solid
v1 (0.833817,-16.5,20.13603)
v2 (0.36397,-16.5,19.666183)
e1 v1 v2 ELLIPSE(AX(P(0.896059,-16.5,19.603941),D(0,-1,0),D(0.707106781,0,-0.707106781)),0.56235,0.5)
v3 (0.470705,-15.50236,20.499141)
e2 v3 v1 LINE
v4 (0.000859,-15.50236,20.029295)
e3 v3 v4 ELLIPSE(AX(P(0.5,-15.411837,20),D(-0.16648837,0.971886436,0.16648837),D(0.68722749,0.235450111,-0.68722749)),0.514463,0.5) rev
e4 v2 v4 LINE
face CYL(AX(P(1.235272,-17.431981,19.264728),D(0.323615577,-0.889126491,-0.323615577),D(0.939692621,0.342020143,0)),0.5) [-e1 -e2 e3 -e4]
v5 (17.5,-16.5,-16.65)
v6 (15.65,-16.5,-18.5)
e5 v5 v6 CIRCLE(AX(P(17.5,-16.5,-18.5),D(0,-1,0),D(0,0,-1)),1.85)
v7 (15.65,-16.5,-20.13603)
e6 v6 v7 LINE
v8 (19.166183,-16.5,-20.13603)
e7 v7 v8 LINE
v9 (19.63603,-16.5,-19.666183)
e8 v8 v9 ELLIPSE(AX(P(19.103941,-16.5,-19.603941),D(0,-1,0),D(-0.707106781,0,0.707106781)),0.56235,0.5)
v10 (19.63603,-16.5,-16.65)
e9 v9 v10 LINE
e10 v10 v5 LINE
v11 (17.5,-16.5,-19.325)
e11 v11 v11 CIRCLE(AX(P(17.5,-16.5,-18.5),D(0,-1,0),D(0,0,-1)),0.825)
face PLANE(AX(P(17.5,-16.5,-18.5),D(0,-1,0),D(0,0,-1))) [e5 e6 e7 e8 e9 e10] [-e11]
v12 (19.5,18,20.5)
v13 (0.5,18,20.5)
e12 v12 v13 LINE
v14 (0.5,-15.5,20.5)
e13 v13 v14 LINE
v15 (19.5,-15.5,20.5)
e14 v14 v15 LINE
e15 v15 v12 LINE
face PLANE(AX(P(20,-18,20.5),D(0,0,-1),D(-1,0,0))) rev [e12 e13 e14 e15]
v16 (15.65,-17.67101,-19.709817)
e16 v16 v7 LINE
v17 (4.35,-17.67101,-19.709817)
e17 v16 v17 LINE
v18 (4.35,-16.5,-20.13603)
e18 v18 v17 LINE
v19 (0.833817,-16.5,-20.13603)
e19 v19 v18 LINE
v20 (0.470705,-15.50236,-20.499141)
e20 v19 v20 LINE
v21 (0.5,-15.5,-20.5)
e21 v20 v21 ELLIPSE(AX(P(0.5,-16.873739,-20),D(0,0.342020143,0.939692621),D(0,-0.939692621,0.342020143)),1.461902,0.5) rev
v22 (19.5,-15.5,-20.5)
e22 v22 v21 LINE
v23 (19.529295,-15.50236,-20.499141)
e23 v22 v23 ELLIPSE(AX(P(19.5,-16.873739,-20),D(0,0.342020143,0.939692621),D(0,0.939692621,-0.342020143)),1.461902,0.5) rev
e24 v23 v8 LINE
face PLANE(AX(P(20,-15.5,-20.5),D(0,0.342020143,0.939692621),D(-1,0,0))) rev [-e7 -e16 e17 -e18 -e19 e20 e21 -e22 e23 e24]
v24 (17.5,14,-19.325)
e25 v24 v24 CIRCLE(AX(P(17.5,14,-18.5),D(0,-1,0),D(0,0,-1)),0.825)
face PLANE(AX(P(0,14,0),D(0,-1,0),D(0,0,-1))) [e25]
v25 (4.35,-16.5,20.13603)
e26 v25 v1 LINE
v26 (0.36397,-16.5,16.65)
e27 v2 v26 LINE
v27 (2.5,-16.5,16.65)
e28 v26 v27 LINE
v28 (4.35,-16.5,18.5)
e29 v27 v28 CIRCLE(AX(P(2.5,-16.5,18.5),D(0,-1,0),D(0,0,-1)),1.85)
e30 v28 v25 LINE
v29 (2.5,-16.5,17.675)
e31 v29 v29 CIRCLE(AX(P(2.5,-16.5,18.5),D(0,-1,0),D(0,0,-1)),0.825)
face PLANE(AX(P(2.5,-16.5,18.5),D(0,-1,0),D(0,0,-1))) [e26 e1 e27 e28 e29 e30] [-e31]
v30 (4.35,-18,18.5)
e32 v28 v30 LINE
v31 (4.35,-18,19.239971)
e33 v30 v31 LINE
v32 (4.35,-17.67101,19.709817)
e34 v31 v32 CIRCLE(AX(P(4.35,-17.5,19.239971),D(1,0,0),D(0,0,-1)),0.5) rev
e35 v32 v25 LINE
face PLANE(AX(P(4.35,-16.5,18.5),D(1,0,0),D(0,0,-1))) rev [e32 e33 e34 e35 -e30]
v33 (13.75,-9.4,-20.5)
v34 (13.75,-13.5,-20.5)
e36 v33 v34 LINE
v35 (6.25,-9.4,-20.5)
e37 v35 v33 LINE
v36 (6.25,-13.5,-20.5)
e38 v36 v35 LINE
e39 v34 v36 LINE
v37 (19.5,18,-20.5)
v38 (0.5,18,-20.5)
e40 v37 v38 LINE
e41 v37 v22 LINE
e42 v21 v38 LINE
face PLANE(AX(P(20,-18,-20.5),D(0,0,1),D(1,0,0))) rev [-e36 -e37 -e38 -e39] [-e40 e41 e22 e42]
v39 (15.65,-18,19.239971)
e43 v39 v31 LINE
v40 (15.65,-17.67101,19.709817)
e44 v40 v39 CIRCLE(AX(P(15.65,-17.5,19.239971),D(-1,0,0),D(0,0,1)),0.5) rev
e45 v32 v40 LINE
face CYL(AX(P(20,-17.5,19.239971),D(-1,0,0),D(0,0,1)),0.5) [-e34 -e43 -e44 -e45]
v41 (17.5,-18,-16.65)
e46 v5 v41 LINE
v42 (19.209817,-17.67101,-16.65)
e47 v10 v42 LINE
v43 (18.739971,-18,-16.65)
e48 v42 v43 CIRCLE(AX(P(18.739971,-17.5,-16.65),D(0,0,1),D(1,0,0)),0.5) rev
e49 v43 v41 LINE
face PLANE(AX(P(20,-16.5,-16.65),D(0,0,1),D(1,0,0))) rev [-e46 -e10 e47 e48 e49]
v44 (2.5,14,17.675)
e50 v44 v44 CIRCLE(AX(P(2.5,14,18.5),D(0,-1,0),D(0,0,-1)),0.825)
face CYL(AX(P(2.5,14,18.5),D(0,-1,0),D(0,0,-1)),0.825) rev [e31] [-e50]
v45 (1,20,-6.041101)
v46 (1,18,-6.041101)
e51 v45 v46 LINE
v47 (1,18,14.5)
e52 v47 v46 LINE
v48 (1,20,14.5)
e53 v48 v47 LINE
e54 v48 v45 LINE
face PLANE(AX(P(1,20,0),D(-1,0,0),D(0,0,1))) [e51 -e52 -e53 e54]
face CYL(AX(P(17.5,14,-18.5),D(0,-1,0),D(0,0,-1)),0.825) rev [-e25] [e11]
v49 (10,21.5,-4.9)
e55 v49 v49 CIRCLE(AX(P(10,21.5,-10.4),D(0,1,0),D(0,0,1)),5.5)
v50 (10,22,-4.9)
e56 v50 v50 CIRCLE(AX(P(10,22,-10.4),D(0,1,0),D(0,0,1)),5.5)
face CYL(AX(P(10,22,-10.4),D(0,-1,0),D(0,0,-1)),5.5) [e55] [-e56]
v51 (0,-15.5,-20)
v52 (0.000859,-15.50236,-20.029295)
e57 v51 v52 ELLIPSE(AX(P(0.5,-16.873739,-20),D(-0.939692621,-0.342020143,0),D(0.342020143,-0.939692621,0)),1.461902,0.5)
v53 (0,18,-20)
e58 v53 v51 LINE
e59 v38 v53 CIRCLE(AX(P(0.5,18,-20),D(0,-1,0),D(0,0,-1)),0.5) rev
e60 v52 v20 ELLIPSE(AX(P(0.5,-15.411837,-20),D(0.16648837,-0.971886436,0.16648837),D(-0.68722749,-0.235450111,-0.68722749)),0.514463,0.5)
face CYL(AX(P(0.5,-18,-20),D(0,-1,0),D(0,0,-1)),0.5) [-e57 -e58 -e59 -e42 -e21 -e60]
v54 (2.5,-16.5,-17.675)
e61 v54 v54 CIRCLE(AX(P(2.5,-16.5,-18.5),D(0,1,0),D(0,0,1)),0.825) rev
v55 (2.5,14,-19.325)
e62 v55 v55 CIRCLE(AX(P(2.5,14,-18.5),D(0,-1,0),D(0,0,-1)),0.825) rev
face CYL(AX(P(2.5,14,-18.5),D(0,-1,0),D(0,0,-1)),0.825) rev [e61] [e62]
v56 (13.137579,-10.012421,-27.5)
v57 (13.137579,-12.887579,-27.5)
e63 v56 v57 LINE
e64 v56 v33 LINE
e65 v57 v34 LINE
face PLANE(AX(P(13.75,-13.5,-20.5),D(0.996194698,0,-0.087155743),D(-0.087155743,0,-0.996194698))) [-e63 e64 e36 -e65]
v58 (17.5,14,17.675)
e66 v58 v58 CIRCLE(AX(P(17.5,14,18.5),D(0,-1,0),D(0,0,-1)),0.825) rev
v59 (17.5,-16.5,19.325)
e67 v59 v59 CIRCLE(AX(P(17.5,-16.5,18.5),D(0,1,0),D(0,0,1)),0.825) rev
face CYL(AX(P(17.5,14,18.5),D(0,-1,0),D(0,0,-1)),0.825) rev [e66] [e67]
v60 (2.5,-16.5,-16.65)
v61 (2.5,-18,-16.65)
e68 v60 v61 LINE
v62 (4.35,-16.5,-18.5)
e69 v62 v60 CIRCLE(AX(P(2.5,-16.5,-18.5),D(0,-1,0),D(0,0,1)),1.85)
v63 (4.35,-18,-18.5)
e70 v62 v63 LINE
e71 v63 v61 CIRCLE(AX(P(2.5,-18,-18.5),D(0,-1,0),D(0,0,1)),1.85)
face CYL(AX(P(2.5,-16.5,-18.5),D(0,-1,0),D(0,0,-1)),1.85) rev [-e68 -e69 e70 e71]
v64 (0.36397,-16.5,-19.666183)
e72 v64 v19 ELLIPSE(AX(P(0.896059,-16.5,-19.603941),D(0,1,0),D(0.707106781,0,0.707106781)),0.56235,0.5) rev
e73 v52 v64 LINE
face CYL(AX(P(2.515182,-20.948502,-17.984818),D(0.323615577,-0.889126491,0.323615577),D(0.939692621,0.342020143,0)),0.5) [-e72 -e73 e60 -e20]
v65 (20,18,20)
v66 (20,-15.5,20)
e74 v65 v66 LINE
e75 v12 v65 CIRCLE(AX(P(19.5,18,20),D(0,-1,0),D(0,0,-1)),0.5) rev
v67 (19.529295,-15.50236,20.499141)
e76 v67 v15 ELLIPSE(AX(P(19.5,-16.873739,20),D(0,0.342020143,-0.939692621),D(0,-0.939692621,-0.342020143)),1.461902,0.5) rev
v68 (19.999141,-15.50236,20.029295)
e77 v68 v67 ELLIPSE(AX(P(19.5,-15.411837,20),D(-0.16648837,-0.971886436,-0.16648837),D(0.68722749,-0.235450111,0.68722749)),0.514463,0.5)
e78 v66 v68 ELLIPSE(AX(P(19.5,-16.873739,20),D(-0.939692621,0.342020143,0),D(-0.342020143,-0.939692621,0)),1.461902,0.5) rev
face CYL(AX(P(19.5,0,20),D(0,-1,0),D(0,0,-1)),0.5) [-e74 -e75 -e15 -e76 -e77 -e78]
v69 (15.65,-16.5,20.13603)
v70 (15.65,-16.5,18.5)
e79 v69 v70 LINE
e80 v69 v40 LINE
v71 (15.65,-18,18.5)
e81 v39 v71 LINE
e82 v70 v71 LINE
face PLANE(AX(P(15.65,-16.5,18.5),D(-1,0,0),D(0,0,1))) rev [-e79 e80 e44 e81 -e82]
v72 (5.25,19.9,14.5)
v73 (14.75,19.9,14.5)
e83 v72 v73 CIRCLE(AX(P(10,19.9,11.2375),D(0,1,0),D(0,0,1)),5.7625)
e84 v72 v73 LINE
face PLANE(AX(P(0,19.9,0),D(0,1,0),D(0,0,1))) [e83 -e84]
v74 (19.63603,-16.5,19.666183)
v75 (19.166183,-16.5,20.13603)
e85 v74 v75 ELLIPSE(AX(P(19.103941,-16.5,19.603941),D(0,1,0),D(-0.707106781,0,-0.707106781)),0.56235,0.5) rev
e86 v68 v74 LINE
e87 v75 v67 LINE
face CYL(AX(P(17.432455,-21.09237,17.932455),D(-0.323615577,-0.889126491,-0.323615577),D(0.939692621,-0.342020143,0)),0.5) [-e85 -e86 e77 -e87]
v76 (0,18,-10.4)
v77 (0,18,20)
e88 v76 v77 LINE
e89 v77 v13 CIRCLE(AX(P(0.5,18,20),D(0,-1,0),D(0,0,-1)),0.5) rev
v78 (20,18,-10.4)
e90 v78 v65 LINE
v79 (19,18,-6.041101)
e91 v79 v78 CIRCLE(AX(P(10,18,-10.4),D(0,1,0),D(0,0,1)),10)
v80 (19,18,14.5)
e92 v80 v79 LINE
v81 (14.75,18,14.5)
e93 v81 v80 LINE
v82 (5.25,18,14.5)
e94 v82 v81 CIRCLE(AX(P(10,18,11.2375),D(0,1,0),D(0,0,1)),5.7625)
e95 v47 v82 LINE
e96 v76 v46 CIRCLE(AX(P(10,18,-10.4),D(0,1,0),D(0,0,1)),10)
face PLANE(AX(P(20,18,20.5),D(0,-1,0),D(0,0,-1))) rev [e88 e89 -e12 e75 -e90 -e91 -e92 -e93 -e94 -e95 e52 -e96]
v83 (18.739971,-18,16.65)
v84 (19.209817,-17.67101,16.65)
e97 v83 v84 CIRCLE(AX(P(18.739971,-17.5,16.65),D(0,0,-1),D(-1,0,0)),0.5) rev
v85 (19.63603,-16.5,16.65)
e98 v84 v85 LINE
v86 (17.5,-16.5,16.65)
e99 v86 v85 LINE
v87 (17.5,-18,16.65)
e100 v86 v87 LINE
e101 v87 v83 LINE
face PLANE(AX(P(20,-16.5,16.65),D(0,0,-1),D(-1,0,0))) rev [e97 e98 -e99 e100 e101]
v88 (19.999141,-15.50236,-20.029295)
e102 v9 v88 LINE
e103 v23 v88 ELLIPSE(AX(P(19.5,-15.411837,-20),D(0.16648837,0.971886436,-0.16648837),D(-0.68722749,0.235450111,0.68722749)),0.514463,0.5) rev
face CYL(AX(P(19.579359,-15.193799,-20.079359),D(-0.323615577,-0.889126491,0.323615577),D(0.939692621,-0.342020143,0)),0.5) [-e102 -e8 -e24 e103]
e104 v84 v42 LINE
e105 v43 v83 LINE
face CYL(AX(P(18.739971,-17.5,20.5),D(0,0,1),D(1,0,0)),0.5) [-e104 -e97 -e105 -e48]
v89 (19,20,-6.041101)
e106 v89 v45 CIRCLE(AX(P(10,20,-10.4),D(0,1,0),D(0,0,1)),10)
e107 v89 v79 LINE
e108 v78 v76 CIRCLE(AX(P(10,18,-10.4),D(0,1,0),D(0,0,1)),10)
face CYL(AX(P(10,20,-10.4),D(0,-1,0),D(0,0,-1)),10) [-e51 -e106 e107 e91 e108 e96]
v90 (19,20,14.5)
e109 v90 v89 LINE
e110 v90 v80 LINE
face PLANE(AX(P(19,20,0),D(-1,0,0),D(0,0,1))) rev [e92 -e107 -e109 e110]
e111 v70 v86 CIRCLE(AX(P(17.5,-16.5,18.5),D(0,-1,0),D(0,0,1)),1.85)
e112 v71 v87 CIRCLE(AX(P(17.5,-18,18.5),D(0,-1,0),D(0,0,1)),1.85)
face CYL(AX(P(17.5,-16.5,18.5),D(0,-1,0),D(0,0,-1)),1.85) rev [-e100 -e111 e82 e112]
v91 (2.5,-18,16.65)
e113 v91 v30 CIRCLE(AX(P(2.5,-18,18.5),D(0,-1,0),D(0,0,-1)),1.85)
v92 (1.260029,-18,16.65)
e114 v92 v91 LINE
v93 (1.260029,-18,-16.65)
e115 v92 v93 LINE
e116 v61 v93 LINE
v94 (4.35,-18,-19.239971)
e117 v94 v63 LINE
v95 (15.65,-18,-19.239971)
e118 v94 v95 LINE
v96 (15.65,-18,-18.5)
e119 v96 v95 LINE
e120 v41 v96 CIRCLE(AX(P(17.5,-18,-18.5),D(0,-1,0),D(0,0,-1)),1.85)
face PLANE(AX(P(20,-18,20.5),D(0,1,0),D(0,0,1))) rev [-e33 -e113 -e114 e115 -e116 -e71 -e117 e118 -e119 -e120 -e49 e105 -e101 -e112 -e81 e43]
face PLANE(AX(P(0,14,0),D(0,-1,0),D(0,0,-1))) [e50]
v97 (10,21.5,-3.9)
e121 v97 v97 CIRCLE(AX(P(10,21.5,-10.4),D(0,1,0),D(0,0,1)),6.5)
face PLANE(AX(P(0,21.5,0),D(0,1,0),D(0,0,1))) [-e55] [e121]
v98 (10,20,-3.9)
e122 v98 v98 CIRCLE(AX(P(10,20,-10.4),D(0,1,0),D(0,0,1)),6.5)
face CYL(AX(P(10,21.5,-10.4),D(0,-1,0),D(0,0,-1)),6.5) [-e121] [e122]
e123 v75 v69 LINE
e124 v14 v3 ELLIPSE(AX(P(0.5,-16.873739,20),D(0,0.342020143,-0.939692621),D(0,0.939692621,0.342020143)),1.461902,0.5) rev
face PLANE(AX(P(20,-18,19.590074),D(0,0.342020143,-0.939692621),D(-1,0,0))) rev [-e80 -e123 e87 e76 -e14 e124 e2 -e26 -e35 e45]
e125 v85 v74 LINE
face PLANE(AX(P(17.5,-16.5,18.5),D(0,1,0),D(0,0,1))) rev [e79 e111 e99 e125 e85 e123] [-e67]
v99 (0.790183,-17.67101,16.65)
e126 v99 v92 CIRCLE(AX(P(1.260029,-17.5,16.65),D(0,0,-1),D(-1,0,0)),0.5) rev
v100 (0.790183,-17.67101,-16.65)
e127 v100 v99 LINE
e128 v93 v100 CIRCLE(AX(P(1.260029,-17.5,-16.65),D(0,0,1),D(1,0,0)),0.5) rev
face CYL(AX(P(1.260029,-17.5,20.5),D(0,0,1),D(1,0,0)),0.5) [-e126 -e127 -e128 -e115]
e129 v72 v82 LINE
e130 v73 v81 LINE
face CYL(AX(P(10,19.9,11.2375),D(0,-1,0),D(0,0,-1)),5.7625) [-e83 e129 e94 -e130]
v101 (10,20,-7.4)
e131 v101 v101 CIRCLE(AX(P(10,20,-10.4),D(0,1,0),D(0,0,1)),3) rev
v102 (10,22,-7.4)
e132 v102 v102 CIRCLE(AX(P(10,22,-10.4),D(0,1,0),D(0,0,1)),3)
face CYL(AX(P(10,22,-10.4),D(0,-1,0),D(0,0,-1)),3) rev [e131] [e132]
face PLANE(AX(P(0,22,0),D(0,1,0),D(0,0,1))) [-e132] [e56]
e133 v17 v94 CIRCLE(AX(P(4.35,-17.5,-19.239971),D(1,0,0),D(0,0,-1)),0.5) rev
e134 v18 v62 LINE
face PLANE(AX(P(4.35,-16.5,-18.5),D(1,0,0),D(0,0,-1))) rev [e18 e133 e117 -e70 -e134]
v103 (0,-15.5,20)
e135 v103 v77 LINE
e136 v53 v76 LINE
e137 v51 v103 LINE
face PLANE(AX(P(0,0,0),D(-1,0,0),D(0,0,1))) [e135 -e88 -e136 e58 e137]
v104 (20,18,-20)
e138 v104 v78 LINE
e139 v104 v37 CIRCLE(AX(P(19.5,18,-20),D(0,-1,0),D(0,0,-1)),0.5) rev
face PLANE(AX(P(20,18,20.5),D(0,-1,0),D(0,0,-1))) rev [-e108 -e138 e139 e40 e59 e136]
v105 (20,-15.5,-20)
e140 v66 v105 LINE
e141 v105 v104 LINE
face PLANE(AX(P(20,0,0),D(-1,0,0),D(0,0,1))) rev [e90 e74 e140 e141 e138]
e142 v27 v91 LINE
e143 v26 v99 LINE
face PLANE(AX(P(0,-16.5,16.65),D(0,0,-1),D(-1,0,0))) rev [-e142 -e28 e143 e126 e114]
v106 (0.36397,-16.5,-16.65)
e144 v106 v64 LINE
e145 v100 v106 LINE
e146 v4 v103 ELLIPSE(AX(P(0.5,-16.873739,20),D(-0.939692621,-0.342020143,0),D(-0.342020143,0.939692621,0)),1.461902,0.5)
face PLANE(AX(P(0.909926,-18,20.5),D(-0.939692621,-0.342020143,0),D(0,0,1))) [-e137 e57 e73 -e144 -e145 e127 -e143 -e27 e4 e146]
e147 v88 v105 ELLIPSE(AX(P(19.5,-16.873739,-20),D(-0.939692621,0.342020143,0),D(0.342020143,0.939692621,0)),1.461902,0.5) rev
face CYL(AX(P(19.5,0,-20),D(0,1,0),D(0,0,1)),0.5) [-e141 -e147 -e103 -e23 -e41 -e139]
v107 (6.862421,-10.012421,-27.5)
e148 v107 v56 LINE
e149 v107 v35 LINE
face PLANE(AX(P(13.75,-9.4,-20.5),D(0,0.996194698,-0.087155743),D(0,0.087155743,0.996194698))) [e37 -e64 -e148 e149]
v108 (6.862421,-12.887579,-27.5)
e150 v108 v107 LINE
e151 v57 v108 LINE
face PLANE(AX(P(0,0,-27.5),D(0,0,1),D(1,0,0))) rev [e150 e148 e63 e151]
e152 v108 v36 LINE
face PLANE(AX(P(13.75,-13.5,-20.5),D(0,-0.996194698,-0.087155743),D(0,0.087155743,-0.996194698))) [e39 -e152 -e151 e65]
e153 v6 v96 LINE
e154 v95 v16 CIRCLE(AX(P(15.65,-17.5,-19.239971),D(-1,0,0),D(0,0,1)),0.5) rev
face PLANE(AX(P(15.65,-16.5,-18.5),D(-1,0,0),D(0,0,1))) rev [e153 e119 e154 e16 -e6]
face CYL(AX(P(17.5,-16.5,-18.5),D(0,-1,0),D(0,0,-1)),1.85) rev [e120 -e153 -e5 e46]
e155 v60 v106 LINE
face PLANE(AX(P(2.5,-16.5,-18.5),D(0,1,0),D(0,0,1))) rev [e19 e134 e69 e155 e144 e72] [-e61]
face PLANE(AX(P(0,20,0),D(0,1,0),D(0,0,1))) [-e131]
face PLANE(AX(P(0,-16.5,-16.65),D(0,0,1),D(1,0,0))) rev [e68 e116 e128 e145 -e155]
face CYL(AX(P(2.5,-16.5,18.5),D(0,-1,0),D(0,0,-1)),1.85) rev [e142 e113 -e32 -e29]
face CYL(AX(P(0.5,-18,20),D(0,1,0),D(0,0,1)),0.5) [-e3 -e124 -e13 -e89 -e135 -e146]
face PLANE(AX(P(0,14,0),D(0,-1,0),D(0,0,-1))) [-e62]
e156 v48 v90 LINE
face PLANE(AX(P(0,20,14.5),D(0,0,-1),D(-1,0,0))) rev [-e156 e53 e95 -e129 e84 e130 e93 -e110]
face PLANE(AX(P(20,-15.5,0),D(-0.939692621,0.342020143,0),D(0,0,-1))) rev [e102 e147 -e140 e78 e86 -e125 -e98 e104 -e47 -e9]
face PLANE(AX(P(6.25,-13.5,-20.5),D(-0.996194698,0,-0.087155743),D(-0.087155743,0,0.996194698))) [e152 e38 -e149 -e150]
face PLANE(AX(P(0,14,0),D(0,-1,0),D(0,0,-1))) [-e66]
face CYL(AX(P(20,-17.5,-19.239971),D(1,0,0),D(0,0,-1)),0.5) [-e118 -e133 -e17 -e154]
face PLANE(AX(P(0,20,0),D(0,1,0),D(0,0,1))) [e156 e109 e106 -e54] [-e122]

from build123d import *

# Parameters (mm, degrees)
SKETCH1_W             = 41
SKETCH1_H             = 36
BOSS_EXTRUDE1_DEPTH   = 20
BOSS_EXTRUDE2_DEPTH   = 2
BOSS_EXTRUDE3_DEPTH   = 1.9
SKETCH3_R             = 6.5
SKETCH3_R_2           = 5.5
BOSS_EXTRUDE4_DEPTH   = 1.5
SKETCH3_3_R           = 5.5
SKETCH3_3_R_2         = 3
BOSS_EXTRUDE5_DEPTH   = 2
SKETCH10_R            = 0.825
CUT_EXTRUDE3_DEPTH    = 1.5
SKETCH10_10_R         = 0.825
CUT_EXTRUDE4_DEPTH    = 32
CHAMFER2_SIZE         = 2.5
CHAMFER2_SIZE2        = 0.909925586
CHAMFER2_PART_2_SIZE  = 2.5
CHAMFER2_PART_2_SIZE2 = 0.909925586
CHAMFER2_PART_3_SIZE  = 2.5
CHAMFER2_PART_3_SIZE2 = 0.909925586
CHAMFER2_PART_4_SIZE  = 2.5
CHAMFER2_PART_4_SIZE2 = 0.909925586
FILLET2_R             = 0.5
SKETCH11_W            = 7.5
SKETCH11_H            = 4.1
BOSS_EXTRUDE10_DEPTH  = 7
BOSS_EXTRUDE10_TAPER  = 5


with BuildPart() as part:
    # Sketch1 → Boss-Extrude1 (new body)
    with BuildSketch(Plane(origin=(0, 0, 0), x_dir=(0, 0, -1), z_dir=(1, 0, 0))):
        Rectangle(SKETCH1_W, SKETCH1_H)
    extrude(amount=BOSS_EXTRUDE1_DEPTH)

    # Sketch2 → Boss-Extrude2 (add)
    with BuildSketch(Plane(origin=(0, 18, 0), x_dir=(1, 0, 0), z_dir=(0, 1, 0))):
        with BuildLine():
            ThreePointArc((20, 10.4), (7.763932023, 20.146794345), (1, 6.041101056))
            Line((1, 6.041101056), (1, 10.5))
            Line((1, 10.5), (19, 10.5))
            Line((19, 10.5), (19, 6.041101056))
            ThreePointArc((19, 6.041101056), (19.746794345, 8.163932022), (20, 10.4))
        make_face()
        with BuildLine():
            Line((1, 10.5), (1, 6.041101056))
            ThreePointArc((1, 6.041101056), (10, 0.4), (19, 6.041101056))
            Line((19, 6.041101056), (19, 10.5))
            Line((19, 10.5), (1, 10.5))
        make_face()
        with BuildLine():
            Line((1, 6.041101056), (1, -14.5))
            Line((1, -14.5), (5.25, -14.5))
            Line((5.25, -14.5), (14.75, -14.5))
            Line((14.75, -14.5), (19, -14.5))
            Line((19, -14.5), (19, 6.041101056))
            ThreePointArc((19, 6.041101056), (10, 0.4), (1, 6.041101056))
        make_face()
    extrude(amount=BOSS_EXTRUDE2_DEPTH)

    # Sketch2<3> → Boss-Extrude3 (add)
    with BuildSketch(Plane(origin=(0, 18, 0), x_dir=(1, 0, 0), z_dir=(0, 1, 0))):
        with BuildLine():
            Line((14.75, -14.5), (5.25, -14.5))
            ThreePointArc((5.25, -14.5), (10, -17), (14.75, -14.5))
        make_face()
    extrude(amount=BOSS_EXTRUDE3_DEPTH)

    # Sketch3 → Boss-Extrude4 (add)
    with BuildSketch(Plane(origin=(0, 20, 0), x_dir=(1, 0, 0), z_dir=(0, 1, 0))):
        with Locations(Location((10, 10.4, 0), (0, 0, 270))):
            Circle(SKETCH3_R)
        with Locations(Location((10, 10.4, 0), (0, 0, 270))):
            Circle(SKETCH3_R_2, mode=Mode.SUBTRACT)
    extrude(amount=BOSS_EXTRUDE4_DEPTH)

    # Sketch3<3> → Boss-Extrude5 (add)
    with BuildSketch(Plane(origin=(0, 20, 0), x_dir=(1, 0, 0), z_dir=(0, 1, 0))):
        with Locations(Location((10, 10.4, 0), (0, 0, 270))):
            Circle(SKETCH3_3_R)
        with Locations(Location((10, 10.4, 0), (0, 0, 270))):
            Circle(SKETCH3_3_R_2, mode=Mode.SUBTRACT)
    extrude(amount=BOSS_EXTRUDE5_DEPTH)

    # Sketch10 → Cut-Extrude3 (cut)
    # profile 1 of 4: a face of its own
    with BuildSketch(Plane.XZ.offset(18)):
        with BuildLine():
            Line((0, 16.65), (2.5, 16.65))
            ThreePointArc((2.5, 16.65), (3.808147545, 17.191852455), (4.35, 18.5))
            Line((4.35, 18.5), (4.35, 20.5))
            Line((4.35, 20.5), (0, 20.5))
            Line((0, 20.5), (0, 16.65))
        make_face()
        with Locations(Location((2.5, 18.5, 0), (0, 0, 270))):
            Circle(SKETCH10_R, mode=Mode.SUBTRACT)
    # profile 2 of 4: a face of its own
    with BuildSketch(Plane.XZ.offset(18)):
        with BuildLine():
            Line((15.65, 18.5), (15.65, 20.5))
            Line((15.65, 20.5), (20, 20.5))
            Line((20, 20.5), (20, 16.65))
            Line((20, 16.65), (17.5, 16.65))
            ThreePointArc((17.5, 16.65), (16.191852455, 17.191852455), (15.65, 18.5))
        make_face()
        with Locations(Location((17.5, 18.5, 0), (0, 0, 90))):
            Circle(SKETCH10_R, mode=Mode.SUBTRACT)
    # profile 3 of 4: a face of its own
    with BuildSketch(Plane.XZ.offset(18)):
        with BuildLine():
            Line((4.35, -18.5), (4.35, -20.5))
            Line((4.35, -20.5), (0, -20.5))
            Line((0, -20.5), (0, -16.65))
            Line((0, -16.65), (2.5, -16.65))
            ThreePointArc((2.5, -16.65), (3.808147545, -17.191852455), (4.35, -18.5))
        make_face()
        with Locations(Location((2.5, -18.5, 0), (0, 0, 90))):
            Circle(SKETCH10_R, mode=Mode.SUBTRACT)
    # profile 4 of 4: a face of its own
    with BuildSketch(Plane.XZ.offset(18)):
        with BuildLine():
            Line((20, -16.65), (17.5, -16.65))
            ThreePointArc((17.5, -16.65), (16.191852455, -17.191852455), (15.65, -18.5))
            Line((15.65, -18.5), (15.65, -20.5))
            Line((15.65, -20.5), (20, -20.5))
            Line((20, -20.5), (20, -16.65))
        make_face()
        with Locations(Location((17.5, -18.5, 0), (0, 0, 270))):
            Circle(SKETCH10_R, mode=Mode.SUBTRACT)
    extrude(amount=-CUT_EXTRUDE3_DEPTH, mode=Mode.SUBTRACT)

    # Sketch10<10> → Cut-Extrude4 (cut)
    with BuildSketch(Plane.XZ.offset(18)):
        with Locations(Location((2.5, 18.5, 0), (0, 0, 270))):
            Circle(SKETCH10_10_R)
        with Locations(Location((17.5, 18.5, 0), (0, 0, 270))):
            Circle(SKETCH10_10_R)
        with Locations(Location((17.5, -18.5, 0), (0, 0, 270))):
            Circle(SKETCH10_10_R)
        with Locations(Location((2.5, -18.5, 0), (0, 0, 270))):
            Circle(SKETCH10_10_R)
    extrude(amount=-CUT_EXTRUDE4_DEPTH, mode=Mode.SUBTRACT)

    # Chamfer2
    chamfer2_edges = [part.edges().sort_by_distance(p)[0] for p in [
        (10, -18, 20.5),
    ]]
    chamfer2_side = [part.faces().sort_by_distance(p)[0] for p in [
        (10, 0.318427753, 20.5),
    ]]
    chamfer(chamfer2_edges, length=CHAMFER2_SIZE, length2=CHAMFER2_SIZE2, reference=chamfer2_side[0])

    # Chamfer2 part 2
    chamfer2_part_2_edges = [part.edges().sort_by_distance(p)[0] for p in [
        (20, -18, 0),
    ]]
    chamfer2_part_2_side = [part.faces().sort_by_distance(p)[0] for p in [
        (20, 0.13604937, 0),
    ]]
    chamfer(chamfer2_part_2_edges, length=CHAMFER2_PART_2_SIZE, length2=CHAMFER2_PART_2_SIZE2, reference=chamfer2_part_2_side[0])

    # Chamfer2 part 3
    chamfer2_part_3_edges = [part.edges().sort_by_distance(p)[0] for p in [
        (10, -18, -20.5),
    ]]
    chamfer2_part_3_side = [part.faces().sort_by_distance(p)[0] for p in [
        (10, 0.318427753, -20.5),
    ]]
    chamfer(chamfer2_part_3_edges, length=CHAMFER2_PART_3_SIZE, length2=CHAMFER2_PART_3_SIZE2, reference=chamfer2_part_3_side[0])

    # Chamfer2 part 4
    chamfer2_part_4_edges = [part.edges().sort_by_distance(p)[0] for p in [
        (0, -18, 0),
    ]]
    chamfer2_part_4_side = [part.faces().sort_by_distance(p)[0] for p in [
        (0, 0.13604937, 0),
    ]]
    chamfer(chamfer2_part_4_edges, length=CHAMFER2_PART_4_SIZE, length2=CHAMFER2_PART_4_SIZE2, reference=chamfer2_part_4_side[0])

    # Fillet2
    # the kernel refuses this fillet: 0.5 mm, written as the material it takes off along each edge
    with BuildSketch(Plane(origin=(20, 19.25, 20.5), x_dir=(-1, 0, 0), z_dir=(0, -1, 0)), Plane(origin=(0, -16.75, -20.5), x_dir=(0, 0, 1), z_dir=(0, 1, 0)), Plane(origin=(20, -16.75, -20.5), x_dir=(-1, 0, 0), z_dir=(0, 1, 0)), Plane(origin=(0, 19.25, 20.5), x_dir=(0, 0, -1), z_dir=(0, -1, 0))) as fillet2_piece_1:
        with BuildLine():
            CenterArc((FILLET2_R, FILLET2_R), FILLET2_R, 180, 90)
            Line((0, FILLET2_R), (0, 0))
            Line((0, 0), (FILLET2_R, 0))
        make_face()
    extrude(amount=36, mode=Mode.SUBTRACT)
    with BuildSketch(Plane(origin=(19.090074414, -18, 17.525259423), x_dir=(-1, 0, 0), z_dir=(0, 0, -1))) as fillet2_piece_2:
        with BuildLine():
            CenterArc((FILLET2_R * 0.70020753821, FILLET2_R), FILLET2_R, 200, 70)
            Line((-FILLET2_R * 0.239485082576, FILLET2_R * 0.657979856674), (0, 0))
            Line((0, 0), (FILLET2_R * 0.70020753821, 0))
        make_face()
    extrude(amount=35.050518846, mode=Mode.SUBTRACT)
    with BuildSketch(Plane(origin=(3.474740577, -18, 19.590074414), x_dir=(0, 0, -1), z_dir=(1, 0, 0))) as fillet2_piece_3:
        with BuildLine():
            CenterArc((FILLET2_R * 0.70020753821, FILLET2_R), FILLET2_R, 200, 70)
            Line((-FILLET2_R * 0.239485082576, FILLET2_R * 0.657979856674), (0, 0))
            Line((0, 0), (FILLET2_R * 0.70020753821, 0))
        make_face()
    extrude(amount=13.050518846, mode=Mode.SUBTRACT)
    with BuildSketch(Plane(origin=(0.909925586, -18, 17.525259423), x_dir=(1, 0, 0), z_dir=(0, 0, -1))) as fillet2_piece_4:
        with BuildLine():
            CenterArc((FILLET2_R * 0.70020753821, -FILLET2_R), FILLET2_R, 90, 70)
            Line((-FILLET2_R * 0.239485082576, -FILLET2_R * 0.657979856674), (0, 0))
            Line((0, 0), (FILLET2_R * 0.70020753821, 0))
        make_face()
    extrude(amount=35.050518846, mode=Mode.SUBTRACT)
    with BuildSketch(Plane(origin=(3.474740577, -18, -19.590074414), x_dir=(0, 0, 1), z_dir=(1, 0, 0))) as fillet2_piece_5:
        with BuildLine():
            CenterArc((FILLET2_R * 0.70020753821, -FILLET2_R), FILLET2_R, 90, 70)
            Line((-FILLET2_R * 0.239485082576, -FILLET2_R * 0.657979856674), (0, 0))
            Line((0, 0), (FILLET2_R * 0.70020753821, 0))
        make_face()
    extrude(amount=13.050518846, mode=Mode.SUBTRACT)
    with BuildSketch(Plane(origin=(20.359668978, -14.511817604, 20.859668978), x_dir=(-0.9461886483394649, 0.3040991697893318, 0.1106830460683808), z_dir=(-0.3236155771181854, -0.8891264907159879, -0.3236155771181854)), Plane(origin=(-0.359668978, -14.511817604, 20.859668978), x_dir=(-0.11068304606838054, 0.30409916978933194, -0.9461886483394649), z_dir=(0.3236155771181852, -0.8891264907159879, -0.32361557711818534))) as fillet2_piece_6:
        with BuildLine():
            CenterArc((FILLET2_R * 0.889126490716, FILLET2_R), FILLET2_R, 186.717713464, 83.282286536)
            Line((-FILLET2_R * 0.104008041637, FILLET2_R * 0.883022221559), (0, 0))
            Line((0, 0), (FILLET2_R * 0.889126490716, 0))
        make_face()
    extrude(amount=3.347515592, mode=Mode.SUBTRACT)
    with BuildSketch(Plane(origin=(20.359668978, -14.511817604, -20.859668978), x_dir=(-0.9461886483394651, 0.3040991697893314, -0.1106830460683821), z_dir=(-0.3236155771181854, -0.8891264907159879, 0.3236155771181854)), Plane(origin=(-0.359668978, -14.511817604, -20.859668978), x_dir=(-0.11068304606838054, 0.30409916978933194, 0.946188648339465), z_dir=(0.3236155771181852, -0.8891264907159879, 0.32361557711818534))) as fillet2_piece_7:
        with BuildLine():
            CenterArc((FILLET2_R * 0.889126490716, -FILLET2_R), FILLET2_R, 90, 83.282286536)
            Line((-FILLET2_R * 0.104008041637, -FILLET2_R * 0.883022221559), (0, 0))
            Line((0, 0), (FILLET2_R * 0.889126490716, 0))
        make_face()
    extrude(amount=3.347515592, mode=Mode.SUBTRACT)

    # Sketch11 → Boss-Extrude10 (add)
    with BuildSketch(Plane(origin=(0, 0, -20.5), x_dir=(-1, 0, 0), z_dir=(0, 0, -1))):
        with Locations((-10, -11.45)):
            Rectangle(SKETCH11_W, SKETCH11_H)
    extrude(amount=BOSS_EXTRUDE10_DEPTH, taper=BOSS_EXTRUDE10_TAPER)


solid = part.part
